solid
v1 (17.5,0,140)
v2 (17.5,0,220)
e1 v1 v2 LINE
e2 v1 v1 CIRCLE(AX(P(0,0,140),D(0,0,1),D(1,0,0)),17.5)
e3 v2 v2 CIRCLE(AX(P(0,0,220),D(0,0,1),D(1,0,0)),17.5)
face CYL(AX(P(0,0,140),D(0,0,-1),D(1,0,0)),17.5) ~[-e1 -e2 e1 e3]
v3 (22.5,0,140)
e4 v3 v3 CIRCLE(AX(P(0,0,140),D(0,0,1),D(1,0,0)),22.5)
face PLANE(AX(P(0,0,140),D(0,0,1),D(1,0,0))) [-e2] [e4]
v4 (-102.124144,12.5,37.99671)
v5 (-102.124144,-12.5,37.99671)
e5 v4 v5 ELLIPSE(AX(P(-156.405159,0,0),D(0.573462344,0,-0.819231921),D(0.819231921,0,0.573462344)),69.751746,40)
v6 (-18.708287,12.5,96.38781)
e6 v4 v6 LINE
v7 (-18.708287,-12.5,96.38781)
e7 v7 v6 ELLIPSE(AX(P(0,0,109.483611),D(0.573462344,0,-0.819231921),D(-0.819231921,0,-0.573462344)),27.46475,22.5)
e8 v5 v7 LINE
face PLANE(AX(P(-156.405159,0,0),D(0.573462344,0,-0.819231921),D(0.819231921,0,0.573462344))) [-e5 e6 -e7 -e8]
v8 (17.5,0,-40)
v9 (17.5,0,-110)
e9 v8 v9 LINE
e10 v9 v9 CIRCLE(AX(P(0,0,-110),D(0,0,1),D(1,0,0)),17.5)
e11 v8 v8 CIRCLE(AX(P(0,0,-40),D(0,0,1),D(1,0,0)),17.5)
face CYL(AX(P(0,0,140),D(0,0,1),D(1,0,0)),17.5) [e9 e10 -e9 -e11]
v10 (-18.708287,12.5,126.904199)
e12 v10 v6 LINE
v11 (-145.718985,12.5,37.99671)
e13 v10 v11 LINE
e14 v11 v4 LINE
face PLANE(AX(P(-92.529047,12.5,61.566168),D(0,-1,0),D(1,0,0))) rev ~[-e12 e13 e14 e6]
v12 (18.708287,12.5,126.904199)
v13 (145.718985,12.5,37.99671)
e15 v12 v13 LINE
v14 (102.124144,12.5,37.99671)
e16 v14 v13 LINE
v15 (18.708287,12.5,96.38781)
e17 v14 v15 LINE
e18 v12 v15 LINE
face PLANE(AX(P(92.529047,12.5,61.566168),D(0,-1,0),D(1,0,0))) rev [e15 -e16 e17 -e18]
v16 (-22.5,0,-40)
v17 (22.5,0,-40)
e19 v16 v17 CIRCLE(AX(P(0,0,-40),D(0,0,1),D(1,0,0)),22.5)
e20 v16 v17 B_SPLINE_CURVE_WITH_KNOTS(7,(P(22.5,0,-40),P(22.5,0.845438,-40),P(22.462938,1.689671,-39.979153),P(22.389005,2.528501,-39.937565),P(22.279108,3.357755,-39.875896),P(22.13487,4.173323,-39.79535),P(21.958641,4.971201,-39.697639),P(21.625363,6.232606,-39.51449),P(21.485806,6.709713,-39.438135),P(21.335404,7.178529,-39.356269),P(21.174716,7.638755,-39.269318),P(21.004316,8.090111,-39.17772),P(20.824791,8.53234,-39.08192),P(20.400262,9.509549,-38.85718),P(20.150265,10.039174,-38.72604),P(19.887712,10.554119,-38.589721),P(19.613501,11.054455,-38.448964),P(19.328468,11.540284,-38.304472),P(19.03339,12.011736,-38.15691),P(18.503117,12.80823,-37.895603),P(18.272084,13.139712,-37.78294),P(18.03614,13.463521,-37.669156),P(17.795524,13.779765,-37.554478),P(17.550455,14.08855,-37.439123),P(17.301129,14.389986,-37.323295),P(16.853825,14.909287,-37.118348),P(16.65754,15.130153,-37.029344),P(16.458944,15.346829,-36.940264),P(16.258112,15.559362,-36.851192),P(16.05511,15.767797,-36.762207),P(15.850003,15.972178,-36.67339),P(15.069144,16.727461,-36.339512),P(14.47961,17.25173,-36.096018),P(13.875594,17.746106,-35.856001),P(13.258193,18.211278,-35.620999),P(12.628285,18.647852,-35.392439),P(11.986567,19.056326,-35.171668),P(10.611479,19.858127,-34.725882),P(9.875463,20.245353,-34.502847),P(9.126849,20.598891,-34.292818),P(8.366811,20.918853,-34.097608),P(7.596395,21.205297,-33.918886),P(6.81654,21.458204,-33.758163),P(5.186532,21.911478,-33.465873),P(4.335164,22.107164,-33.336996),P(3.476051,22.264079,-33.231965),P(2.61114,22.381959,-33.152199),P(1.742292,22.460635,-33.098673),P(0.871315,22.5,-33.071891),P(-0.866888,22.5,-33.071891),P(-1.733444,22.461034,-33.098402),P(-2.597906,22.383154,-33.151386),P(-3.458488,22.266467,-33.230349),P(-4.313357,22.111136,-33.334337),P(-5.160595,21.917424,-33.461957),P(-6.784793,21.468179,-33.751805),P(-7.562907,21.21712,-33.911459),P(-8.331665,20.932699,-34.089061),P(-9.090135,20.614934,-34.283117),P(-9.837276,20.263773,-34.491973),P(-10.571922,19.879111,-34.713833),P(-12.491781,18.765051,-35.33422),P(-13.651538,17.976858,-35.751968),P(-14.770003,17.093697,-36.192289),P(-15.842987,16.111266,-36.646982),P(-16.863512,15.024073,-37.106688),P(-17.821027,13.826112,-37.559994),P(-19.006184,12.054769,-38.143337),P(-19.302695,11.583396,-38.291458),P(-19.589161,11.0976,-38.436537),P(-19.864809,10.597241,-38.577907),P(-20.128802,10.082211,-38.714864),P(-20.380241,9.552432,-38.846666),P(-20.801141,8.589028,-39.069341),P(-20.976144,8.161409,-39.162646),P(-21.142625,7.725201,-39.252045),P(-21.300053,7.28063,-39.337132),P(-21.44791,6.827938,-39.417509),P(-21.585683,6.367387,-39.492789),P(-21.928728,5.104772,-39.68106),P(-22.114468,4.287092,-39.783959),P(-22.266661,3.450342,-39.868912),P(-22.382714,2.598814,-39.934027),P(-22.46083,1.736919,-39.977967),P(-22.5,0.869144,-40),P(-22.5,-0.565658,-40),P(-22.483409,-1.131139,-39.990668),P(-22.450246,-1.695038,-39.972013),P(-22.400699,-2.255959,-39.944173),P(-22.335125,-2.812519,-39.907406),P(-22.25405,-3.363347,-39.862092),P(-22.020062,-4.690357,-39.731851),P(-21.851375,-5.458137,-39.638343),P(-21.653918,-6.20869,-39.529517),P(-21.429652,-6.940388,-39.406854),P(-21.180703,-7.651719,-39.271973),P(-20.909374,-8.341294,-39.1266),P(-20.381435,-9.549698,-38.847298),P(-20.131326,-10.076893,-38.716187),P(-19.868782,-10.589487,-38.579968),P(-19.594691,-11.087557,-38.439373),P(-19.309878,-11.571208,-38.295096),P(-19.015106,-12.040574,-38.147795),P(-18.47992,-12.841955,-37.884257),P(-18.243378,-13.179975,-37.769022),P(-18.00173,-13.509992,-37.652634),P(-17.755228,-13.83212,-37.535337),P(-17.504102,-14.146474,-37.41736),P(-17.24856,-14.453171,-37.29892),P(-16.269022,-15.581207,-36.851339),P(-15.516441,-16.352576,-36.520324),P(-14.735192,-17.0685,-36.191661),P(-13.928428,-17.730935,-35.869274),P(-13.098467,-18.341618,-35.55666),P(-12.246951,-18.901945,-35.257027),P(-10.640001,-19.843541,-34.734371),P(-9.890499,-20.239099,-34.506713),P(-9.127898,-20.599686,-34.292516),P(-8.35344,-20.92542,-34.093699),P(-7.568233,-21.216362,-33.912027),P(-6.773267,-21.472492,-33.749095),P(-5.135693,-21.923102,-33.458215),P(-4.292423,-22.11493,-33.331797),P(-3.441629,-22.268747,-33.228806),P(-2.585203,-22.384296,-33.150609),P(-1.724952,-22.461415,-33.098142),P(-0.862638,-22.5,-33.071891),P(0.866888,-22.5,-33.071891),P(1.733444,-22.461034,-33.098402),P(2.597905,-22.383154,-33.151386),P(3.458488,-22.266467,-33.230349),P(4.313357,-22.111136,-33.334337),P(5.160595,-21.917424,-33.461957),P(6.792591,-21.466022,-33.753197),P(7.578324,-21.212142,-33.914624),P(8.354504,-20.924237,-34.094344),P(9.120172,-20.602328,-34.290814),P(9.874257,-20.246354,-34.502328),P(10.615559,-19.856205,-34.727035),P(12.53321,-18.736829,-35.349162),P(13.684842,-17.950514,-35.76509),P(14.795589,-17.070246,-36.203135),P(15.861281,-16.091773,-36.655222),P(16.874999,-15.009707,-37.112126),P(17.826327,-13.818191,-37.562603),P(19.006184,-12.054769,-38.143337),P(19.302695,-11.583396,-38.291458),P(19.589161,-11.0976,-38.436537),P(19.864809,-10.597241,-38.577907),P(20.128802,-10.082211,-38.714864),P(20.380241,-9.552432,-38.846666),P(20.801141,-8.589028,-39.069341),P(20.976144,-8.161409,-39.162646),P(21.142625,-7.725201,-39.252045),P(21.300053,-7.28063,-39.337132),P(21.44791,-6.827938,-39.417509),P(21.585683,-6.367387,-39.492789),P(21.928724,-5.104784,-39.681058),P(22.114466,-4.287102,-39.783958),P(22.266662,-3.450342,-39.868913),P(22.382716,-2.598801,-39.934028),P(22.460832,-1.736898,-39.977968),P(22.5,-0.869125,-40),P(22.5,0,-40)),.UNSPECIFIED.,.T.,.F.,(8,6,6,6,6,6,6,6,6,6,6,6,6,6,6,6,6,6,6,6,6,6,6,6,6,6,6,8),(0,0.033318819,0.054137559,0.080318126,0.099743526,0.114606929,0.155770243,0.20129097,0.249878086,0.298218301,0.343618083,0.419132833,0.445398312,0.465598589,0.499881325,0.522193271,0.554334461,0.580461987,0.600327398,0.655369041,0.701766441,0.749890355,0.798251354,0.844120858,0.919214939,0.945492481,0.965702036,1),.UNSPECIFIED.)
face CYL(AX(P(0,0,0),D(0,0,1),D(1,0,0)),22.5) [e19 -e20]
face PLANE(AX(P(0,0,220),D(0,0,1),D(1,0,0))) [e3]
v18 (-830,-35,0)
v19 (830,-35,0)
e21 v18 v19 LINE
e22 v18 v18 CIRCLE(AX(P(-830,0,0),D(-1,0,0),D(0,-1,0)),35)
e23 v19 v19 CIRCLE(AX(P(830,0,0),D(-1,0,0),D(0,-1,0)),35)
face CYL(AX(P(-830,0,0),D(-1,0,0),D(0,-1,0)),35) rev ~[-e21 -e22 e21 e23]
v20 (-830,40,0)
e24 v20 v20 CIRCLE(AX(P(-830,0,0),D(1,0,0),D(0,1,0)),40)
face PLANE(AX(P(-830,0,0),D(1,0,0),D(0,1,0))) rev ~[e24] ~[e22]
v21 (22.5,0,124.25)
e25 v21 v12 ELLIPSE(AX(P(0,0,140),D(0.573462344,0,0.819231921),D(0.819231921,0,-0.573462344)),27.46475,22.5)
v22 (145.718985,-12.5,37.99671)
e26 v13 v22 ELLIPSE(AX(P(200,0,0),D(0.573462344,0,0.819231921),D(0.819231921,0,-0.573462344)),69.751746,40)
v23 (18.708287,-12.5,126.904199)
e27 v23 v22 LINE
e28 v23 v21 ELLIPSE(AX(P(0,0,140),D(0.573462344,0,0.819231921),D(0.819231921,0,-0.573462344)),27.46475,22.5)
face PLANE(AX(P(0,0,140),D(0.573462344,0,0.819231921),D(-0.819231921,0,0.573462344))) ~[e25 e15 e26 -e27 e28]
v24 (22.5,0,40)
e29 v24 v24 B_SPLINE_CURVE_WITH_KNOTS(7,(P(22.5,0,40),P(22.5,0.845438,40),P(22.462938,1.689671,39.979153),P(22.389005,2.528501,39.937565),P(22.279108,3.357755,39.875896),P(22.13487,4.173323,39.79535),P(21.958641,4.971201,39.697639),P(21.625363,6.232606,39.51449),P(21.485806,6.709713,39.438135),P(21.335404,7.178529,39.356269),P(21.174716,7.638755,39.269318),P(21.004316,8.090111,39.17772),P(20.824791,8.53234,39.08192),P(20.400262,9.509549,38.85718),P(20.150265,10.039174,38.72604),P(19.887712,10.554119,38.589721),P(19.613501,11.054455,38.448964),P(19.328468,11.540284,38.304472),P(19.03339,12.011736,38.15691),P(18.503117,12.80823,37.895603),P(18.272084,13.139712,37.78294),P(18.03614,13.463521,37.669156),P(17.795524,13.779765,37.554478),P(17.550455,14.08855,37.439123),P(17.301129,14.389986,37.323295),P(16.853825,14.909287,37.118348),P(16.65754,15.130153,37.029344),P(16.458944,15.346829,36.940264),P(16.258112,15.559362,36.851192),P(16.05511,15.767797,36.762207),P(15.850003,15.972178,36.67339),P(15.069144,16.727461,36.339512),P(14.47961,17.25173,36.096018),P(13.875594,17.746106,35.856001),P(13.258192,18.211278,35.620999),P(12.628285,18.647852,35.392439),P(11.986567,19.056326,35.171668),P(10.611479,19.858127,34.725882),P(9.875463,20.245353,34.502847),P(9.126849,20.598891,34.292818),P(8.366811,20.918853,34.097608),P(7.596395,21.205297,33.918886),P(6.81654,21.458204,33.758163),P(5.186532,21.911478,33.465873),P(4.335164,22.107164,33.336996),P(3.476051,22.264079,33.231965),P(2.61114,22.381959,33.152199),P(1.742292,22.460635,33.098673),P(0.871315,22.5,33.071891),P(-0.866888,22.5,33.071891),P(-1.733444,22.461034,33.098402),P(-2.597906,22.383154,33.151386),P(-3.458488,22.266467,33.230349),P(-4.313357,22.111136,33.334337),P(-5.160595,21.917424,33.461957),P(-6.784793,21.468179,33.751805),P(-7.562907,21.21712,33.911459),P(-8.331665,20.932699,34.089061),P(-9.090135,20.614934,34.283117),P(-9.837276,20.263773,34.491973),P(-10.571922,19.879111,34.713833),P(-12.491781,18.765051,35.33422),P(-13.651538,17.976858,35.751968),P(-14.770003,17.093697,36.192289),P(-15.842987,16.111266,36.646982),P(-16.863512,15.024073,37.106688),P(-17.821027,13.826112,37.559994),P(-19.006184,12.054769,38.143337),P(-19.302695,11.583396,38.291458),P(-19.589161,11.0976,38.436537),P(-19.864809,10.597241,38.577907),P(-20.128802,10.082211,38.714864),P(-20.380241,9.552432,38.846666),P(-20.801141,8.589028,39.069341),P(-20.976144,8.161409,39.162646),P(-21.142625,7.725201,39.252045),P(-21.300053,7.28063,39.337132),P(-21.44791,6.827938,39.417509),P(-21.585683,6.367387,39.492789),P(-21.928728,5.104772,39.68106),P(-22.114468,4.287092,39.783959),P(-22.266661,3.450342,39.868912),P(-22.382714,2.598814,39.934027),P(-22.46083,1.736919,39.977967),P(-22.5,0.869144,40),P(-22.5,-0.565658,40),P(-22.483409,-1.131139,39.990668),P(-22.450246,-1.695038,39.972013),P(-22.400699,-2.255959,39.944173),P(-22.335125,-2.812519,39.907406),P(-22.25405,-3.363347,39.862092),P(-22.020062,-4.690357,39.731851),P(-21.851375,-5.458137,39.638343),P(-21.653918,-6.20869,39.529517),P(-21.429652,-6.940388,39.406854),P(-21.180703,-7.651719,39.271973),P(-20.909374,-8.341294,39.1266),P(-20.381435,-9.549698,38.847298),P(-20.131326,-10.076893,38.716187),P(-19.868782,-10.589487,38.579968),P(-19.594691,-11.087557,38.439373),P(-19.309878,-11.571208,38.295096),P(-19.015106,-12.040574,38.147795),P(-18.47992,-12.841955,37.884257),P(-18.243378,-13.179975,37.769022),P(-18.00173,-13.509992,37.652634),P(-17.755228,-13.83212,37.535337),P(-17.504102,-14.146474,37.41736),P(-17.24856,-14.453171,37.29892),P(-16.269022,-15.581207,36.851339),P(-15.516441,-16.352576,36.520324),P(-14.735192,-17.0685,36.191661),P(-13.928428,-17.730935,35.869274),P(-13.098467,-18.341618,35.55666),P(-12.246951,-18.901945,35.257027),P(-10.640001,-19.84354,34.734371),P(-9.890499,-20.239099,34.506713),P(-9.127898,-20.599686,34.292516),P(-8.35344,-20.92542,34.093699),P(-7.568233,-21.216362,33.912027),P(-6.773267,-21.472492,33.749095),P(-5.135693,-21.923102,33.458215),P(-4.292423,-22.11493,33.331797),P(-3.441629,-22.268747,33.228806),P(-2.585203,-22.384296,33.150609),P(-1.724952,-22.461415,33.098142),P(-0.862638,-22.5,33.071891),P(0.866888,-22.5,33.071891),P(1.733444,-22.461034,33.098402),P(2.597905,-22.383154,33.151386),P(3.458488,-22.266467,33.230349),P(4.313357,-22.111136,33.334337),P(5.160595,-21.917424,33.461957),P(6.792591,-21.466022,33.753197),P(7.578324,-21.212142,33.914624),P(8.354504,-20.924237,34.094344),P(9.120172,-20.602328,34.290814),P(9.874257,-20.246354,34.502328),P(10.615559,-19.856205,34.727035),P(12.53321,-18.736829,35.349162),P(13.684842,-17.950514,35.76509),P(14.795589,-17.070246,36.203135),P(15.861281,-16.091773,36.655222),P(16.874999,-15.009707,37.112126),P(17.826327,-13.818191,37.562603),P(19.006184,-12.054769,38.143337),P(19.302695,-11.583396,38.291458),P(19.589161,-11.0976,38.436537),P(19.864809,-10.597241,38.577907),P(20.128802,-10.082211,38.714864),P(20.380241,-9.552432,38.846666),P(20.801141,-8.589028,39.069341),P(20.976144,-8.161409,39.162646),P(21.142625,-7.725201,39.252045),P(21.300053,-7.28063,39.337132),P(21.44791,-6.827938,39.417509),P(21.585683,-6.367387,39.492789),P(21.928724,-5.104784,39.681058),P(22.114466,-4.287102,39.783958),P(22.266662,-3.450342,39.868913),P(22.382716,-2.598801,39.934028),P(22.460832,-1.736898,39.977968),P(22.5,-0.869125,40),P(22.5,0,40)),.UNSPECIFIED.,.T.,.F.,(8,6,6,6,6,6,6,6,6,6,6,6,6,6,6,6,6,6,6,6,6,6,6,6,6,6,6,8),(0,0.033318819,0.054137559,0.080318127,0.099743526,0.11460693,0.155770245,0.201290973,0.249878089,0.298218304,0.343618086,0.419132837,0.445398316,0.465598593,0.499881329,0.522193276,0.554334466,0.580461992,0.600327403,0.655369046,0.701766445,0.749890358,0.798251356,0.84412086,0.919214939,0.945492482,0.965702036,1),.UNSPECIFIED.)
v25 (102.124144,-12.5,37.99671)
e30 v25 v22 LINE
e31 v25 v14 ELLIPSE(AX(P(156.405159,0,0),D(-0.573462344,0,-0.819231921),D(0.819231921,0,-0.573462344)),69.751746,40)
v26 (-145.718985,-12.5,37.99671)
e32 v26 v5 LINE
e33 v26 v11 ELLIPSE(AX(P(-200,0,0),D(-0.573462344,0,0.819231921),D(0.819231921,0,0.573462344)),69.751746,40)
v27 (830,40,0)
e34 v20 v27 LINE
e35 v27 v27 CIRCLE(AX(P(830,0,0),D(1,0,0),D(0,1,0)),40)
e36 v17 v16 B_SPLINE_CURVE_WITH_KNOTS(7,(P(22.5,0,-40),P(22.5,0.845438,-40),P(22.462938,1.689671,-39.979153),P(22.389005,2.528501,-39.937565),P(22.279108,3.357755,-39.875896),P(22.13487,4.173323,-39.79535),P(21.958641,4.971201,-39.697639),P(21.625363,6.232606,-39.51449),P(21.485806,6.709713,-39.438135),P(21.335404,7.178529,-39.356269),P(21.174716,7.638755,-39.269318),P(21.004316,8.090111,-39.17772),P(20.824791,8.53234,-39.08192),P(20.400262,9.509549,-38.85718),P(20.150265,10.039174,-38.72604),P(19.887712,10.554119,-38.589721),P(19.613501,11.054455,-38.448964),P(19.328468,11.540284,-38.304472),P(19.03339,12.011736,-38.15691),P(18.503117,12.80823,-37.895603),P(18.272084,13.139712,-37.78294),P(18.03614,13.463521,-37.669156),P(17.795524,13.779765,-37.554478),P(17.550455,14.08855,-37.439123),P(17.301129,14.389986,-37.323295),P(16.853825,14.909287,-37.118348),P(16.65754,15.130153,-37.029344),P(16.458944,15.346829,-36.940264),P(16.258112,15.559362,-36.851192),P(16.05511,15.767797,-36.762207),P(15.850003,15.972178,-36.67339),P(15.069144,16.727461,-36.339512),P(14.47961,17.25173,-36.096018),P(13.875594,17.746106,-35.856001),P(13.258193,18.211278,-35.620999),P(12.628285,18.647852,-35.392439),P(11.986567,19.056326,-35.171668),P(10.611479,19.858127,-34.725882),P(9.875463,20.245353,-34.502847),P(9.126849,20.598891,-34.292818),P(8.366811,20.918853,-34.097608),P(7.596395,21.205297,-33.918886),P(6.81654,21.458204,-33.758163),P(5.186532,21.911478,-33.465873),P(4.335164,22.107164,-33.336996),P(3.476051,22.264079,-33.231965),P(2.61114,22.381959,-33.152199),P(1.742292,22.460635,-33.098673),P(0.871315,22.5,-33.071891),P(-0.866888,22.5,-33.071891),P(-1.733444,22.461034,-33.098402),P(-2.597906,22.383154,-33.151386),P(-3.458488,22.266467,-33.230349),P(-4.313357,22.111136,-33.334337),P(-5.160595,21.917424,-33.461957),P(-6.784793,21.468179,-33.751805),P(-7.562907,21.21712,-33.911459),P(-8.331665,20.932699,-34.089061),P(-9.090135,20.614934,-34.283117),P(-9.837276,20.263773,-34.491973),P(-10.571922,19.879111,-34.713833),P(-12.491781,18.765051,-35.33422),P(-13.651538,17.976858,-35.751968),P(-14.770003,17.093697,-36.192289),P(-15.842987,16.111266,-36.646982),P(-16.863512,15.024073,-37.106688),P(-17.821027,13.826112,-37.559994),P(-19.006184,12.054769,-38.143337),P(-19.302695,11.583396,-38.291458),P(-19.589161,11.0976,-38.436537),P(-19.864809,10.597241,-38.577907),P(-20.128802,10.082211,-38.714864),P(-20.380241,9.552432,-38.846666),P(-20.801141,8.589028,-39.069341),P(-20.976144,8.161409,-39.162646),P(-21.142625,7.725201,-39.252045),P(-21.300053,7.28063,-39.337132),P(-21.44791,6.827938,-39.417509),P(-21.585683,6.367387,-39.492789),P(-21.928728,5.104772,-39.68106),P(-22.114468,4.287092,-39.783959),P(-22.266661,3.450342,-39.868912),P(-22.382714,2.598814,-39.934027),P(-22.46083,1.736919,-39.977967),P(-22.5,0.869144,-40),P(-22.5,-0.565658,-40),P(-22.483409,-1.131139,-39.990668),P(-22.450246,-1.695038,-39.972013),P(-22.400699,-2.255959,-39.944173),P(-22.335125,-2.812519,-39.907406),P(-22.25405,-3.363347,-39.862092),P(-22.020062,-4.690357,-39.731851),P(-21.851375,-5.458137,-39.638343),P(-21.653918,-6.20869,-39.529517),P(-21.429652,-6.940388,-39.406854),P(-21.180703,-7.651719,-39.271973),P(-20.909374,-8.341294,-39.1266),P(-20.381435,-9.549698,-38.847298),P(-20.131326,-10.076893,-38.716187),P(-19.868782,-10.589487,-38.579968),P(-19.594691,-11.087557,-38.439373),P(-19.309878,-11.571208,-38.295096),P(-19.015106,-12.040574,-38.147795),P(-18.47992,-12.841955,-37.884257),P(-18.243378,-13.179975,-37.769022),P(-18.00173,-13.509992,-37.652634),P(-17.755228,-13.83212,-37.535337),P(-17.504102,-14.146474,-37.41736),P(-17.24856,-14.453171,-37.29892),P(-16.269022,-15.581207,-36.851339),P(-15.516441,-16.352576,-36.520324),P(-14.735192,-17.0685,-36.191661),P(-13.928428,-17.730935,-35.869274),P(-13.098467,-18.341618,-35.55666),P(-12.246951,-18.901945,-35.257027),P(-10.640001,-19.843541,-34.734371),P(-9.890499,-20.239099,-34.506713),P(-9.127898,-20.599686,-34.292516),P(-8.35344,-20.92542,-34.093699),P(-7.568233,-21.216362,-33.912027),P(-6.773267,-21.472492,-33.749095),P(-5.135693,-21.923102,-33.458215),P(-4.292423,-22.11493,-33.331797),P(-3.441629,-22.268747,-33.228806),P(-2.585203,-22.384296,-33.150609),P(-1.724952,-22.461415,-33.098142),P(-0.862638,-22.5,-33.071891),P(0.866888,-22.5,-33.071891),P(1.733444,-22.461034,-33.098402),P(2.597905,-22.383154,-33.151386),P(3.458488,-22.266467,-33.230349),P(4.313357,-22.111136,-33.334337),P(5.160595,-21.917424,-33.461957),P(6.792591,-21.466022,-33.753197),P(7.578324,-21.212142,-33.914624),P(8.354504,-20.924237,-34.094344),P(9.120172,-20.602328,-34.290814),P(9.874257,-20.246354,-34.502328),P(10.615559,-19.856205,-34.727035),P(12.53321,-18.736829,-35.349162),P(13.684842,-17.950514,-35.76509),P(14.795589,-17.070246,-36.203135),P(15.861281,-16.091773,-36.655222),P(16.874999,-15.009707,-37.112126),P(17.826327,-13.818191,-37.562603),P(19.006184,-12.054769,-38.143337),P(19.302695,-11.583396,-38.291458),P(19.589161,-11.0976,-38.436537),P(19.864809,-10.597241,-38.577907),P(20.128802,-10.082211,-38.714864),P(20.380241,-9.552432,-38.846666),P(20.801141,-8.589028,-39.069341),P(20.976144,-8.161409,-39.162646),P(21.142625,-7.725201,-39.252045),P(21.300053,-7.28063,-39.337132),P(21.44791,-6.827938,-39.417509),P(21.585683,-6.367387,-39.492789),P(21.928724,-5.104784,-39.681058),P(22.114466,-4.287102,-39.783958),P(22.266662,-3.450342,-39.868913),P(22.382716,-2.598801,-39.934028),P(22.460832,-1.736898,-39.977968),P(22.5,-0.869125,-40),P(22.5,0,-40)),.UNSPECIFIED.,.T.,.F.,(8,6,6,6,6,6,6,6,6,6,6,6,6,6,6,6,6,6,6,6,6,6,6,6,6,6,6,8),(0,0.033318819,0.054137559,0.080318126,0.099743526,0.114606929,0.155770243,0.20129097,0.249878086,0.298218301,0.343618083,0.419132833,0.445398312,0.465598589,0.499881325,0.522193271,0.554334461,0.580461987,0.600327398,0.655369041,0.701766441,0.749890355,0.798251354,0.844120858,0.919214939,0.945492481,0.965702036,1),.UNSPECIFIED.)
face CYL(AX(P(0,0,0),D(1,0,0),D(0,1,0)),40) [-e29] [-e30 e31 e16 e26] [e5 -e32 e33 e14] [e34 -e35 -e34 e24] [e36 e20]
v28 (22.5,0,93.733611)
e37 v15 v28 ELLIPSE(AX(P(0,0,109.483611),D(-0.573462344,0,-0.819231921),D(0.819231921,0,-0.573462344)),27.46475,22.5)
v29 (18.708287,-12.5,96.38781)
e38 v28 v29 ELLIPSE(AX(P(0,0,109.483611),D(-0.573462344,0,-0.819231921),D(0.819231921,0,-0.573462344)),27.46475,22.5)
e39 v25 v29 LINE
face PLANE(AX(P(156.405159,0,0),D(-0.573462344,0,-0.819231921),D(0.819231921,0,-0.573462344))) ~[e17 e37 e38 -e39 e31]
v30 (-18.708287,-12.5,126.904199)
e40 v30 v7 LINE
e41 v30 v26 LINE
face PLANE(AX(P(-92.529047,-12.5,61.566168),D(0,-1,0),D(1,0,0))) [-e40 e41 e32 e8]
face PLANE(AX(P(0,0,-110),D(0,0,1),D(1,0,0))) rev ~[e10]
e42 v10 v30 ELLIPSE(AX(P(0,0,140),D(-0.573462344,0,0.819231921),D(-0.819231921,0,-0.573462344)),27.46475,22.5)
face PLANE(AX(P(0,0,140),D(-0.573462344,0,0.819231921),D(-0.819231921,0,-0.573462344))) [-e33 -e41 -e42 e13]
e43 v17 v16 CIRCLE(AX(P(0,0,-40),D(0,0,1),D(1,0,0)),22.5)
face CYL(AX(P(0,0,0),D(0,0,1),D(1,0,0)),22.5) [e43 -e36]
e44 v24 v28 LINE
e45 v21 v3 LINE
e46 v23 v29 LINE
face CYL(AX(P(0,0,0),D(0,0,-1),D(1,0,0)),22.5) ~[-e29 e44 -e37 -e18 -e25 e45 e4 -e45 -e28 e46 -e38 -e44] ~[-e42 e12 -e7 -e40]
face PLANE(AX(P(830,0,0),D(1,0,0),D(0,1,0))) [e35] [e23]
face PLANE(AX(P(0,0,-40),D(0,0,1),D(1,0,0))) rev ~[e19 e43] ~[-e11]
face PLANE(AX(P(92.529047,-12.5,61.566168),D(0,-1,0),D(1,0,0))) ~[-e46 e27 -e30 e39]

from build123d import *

# Parameters (mm, degrees)
F0_R          = 40
F1_DEPTH      = 830
F1_DEPTH_BACK = 830
F2_R          = 22.5
F3_DEPTH      = 140
F3_DEPTH_BACK = 40
F4_R          = 17.5
F5_DEPTH      = 80
F5_DEPTH_BACK = 250
F7_DEPTH      = 12.5
F8_R          = 35.000000149
F9_DEPTH      = 1660.0010001


# Not quite as in the source:
# - a pattern or mirror of a feature is missing from the dataset's text; its kind, count and spacing are read off the source's solid


with BuildPart() as f1:
    # F0 (on Right) → F1 (new body, two sides)
    with BuildSketch(Plane.YZ) as f1_sk:
        Circle(F0_R)
    extrude(amount=F1_DEPTH)
    extrude(f1_sk.sketch, amount=-F1_DEPTH_BACK)

    # F2 (on Top) → F3 (join, two sides)
    with BuildSketch(Plane.XY) as f3_sk:
        Circle(F2_R)
    extrude(amount=F3_DEPTH)
    extrude(f3_sk.sketch, amount=-F3_DEPTH_BACK)

    # F4 (on face) → F5 (join, two sides)
    with BuildSketch(Plane.XY.offset(140)) as f5_sk:
        Circle(F4_R)
    extrude(amount=F5_DEPTH)
    extrude(f5_sk.sketch, amount=-F5_DEPTH_BACK)

    # F6 (on Front) → F7 (join, symmetric)
    with BuildSketch(Plane.XZ):
        Polygon((0, 109.4836109607), (0, 140), (-200, 0), (-156.4051585152, 0), align=None)
    f7 = extrude(amount=F7_DEPTH, both=True)

    # F7_copies: F7 across plane
    add(f7.mirror(Plane(origin=(0, 0, 0), x_dir=(0, 0, 1), z_dir=(1, 0, 0))))

    # F8 (on face) → F9 (cut, through all)
    with BuildSketch(Plane(origin=(-830, 0, 0), x_dir=(0, -1, 0), z_dir=(-1, 0, 0))):
        Circle(F8_R)
    extrude(amount=-F9_DEPTH, mode=Mode.SUBTRACT)


solid = f1.part
